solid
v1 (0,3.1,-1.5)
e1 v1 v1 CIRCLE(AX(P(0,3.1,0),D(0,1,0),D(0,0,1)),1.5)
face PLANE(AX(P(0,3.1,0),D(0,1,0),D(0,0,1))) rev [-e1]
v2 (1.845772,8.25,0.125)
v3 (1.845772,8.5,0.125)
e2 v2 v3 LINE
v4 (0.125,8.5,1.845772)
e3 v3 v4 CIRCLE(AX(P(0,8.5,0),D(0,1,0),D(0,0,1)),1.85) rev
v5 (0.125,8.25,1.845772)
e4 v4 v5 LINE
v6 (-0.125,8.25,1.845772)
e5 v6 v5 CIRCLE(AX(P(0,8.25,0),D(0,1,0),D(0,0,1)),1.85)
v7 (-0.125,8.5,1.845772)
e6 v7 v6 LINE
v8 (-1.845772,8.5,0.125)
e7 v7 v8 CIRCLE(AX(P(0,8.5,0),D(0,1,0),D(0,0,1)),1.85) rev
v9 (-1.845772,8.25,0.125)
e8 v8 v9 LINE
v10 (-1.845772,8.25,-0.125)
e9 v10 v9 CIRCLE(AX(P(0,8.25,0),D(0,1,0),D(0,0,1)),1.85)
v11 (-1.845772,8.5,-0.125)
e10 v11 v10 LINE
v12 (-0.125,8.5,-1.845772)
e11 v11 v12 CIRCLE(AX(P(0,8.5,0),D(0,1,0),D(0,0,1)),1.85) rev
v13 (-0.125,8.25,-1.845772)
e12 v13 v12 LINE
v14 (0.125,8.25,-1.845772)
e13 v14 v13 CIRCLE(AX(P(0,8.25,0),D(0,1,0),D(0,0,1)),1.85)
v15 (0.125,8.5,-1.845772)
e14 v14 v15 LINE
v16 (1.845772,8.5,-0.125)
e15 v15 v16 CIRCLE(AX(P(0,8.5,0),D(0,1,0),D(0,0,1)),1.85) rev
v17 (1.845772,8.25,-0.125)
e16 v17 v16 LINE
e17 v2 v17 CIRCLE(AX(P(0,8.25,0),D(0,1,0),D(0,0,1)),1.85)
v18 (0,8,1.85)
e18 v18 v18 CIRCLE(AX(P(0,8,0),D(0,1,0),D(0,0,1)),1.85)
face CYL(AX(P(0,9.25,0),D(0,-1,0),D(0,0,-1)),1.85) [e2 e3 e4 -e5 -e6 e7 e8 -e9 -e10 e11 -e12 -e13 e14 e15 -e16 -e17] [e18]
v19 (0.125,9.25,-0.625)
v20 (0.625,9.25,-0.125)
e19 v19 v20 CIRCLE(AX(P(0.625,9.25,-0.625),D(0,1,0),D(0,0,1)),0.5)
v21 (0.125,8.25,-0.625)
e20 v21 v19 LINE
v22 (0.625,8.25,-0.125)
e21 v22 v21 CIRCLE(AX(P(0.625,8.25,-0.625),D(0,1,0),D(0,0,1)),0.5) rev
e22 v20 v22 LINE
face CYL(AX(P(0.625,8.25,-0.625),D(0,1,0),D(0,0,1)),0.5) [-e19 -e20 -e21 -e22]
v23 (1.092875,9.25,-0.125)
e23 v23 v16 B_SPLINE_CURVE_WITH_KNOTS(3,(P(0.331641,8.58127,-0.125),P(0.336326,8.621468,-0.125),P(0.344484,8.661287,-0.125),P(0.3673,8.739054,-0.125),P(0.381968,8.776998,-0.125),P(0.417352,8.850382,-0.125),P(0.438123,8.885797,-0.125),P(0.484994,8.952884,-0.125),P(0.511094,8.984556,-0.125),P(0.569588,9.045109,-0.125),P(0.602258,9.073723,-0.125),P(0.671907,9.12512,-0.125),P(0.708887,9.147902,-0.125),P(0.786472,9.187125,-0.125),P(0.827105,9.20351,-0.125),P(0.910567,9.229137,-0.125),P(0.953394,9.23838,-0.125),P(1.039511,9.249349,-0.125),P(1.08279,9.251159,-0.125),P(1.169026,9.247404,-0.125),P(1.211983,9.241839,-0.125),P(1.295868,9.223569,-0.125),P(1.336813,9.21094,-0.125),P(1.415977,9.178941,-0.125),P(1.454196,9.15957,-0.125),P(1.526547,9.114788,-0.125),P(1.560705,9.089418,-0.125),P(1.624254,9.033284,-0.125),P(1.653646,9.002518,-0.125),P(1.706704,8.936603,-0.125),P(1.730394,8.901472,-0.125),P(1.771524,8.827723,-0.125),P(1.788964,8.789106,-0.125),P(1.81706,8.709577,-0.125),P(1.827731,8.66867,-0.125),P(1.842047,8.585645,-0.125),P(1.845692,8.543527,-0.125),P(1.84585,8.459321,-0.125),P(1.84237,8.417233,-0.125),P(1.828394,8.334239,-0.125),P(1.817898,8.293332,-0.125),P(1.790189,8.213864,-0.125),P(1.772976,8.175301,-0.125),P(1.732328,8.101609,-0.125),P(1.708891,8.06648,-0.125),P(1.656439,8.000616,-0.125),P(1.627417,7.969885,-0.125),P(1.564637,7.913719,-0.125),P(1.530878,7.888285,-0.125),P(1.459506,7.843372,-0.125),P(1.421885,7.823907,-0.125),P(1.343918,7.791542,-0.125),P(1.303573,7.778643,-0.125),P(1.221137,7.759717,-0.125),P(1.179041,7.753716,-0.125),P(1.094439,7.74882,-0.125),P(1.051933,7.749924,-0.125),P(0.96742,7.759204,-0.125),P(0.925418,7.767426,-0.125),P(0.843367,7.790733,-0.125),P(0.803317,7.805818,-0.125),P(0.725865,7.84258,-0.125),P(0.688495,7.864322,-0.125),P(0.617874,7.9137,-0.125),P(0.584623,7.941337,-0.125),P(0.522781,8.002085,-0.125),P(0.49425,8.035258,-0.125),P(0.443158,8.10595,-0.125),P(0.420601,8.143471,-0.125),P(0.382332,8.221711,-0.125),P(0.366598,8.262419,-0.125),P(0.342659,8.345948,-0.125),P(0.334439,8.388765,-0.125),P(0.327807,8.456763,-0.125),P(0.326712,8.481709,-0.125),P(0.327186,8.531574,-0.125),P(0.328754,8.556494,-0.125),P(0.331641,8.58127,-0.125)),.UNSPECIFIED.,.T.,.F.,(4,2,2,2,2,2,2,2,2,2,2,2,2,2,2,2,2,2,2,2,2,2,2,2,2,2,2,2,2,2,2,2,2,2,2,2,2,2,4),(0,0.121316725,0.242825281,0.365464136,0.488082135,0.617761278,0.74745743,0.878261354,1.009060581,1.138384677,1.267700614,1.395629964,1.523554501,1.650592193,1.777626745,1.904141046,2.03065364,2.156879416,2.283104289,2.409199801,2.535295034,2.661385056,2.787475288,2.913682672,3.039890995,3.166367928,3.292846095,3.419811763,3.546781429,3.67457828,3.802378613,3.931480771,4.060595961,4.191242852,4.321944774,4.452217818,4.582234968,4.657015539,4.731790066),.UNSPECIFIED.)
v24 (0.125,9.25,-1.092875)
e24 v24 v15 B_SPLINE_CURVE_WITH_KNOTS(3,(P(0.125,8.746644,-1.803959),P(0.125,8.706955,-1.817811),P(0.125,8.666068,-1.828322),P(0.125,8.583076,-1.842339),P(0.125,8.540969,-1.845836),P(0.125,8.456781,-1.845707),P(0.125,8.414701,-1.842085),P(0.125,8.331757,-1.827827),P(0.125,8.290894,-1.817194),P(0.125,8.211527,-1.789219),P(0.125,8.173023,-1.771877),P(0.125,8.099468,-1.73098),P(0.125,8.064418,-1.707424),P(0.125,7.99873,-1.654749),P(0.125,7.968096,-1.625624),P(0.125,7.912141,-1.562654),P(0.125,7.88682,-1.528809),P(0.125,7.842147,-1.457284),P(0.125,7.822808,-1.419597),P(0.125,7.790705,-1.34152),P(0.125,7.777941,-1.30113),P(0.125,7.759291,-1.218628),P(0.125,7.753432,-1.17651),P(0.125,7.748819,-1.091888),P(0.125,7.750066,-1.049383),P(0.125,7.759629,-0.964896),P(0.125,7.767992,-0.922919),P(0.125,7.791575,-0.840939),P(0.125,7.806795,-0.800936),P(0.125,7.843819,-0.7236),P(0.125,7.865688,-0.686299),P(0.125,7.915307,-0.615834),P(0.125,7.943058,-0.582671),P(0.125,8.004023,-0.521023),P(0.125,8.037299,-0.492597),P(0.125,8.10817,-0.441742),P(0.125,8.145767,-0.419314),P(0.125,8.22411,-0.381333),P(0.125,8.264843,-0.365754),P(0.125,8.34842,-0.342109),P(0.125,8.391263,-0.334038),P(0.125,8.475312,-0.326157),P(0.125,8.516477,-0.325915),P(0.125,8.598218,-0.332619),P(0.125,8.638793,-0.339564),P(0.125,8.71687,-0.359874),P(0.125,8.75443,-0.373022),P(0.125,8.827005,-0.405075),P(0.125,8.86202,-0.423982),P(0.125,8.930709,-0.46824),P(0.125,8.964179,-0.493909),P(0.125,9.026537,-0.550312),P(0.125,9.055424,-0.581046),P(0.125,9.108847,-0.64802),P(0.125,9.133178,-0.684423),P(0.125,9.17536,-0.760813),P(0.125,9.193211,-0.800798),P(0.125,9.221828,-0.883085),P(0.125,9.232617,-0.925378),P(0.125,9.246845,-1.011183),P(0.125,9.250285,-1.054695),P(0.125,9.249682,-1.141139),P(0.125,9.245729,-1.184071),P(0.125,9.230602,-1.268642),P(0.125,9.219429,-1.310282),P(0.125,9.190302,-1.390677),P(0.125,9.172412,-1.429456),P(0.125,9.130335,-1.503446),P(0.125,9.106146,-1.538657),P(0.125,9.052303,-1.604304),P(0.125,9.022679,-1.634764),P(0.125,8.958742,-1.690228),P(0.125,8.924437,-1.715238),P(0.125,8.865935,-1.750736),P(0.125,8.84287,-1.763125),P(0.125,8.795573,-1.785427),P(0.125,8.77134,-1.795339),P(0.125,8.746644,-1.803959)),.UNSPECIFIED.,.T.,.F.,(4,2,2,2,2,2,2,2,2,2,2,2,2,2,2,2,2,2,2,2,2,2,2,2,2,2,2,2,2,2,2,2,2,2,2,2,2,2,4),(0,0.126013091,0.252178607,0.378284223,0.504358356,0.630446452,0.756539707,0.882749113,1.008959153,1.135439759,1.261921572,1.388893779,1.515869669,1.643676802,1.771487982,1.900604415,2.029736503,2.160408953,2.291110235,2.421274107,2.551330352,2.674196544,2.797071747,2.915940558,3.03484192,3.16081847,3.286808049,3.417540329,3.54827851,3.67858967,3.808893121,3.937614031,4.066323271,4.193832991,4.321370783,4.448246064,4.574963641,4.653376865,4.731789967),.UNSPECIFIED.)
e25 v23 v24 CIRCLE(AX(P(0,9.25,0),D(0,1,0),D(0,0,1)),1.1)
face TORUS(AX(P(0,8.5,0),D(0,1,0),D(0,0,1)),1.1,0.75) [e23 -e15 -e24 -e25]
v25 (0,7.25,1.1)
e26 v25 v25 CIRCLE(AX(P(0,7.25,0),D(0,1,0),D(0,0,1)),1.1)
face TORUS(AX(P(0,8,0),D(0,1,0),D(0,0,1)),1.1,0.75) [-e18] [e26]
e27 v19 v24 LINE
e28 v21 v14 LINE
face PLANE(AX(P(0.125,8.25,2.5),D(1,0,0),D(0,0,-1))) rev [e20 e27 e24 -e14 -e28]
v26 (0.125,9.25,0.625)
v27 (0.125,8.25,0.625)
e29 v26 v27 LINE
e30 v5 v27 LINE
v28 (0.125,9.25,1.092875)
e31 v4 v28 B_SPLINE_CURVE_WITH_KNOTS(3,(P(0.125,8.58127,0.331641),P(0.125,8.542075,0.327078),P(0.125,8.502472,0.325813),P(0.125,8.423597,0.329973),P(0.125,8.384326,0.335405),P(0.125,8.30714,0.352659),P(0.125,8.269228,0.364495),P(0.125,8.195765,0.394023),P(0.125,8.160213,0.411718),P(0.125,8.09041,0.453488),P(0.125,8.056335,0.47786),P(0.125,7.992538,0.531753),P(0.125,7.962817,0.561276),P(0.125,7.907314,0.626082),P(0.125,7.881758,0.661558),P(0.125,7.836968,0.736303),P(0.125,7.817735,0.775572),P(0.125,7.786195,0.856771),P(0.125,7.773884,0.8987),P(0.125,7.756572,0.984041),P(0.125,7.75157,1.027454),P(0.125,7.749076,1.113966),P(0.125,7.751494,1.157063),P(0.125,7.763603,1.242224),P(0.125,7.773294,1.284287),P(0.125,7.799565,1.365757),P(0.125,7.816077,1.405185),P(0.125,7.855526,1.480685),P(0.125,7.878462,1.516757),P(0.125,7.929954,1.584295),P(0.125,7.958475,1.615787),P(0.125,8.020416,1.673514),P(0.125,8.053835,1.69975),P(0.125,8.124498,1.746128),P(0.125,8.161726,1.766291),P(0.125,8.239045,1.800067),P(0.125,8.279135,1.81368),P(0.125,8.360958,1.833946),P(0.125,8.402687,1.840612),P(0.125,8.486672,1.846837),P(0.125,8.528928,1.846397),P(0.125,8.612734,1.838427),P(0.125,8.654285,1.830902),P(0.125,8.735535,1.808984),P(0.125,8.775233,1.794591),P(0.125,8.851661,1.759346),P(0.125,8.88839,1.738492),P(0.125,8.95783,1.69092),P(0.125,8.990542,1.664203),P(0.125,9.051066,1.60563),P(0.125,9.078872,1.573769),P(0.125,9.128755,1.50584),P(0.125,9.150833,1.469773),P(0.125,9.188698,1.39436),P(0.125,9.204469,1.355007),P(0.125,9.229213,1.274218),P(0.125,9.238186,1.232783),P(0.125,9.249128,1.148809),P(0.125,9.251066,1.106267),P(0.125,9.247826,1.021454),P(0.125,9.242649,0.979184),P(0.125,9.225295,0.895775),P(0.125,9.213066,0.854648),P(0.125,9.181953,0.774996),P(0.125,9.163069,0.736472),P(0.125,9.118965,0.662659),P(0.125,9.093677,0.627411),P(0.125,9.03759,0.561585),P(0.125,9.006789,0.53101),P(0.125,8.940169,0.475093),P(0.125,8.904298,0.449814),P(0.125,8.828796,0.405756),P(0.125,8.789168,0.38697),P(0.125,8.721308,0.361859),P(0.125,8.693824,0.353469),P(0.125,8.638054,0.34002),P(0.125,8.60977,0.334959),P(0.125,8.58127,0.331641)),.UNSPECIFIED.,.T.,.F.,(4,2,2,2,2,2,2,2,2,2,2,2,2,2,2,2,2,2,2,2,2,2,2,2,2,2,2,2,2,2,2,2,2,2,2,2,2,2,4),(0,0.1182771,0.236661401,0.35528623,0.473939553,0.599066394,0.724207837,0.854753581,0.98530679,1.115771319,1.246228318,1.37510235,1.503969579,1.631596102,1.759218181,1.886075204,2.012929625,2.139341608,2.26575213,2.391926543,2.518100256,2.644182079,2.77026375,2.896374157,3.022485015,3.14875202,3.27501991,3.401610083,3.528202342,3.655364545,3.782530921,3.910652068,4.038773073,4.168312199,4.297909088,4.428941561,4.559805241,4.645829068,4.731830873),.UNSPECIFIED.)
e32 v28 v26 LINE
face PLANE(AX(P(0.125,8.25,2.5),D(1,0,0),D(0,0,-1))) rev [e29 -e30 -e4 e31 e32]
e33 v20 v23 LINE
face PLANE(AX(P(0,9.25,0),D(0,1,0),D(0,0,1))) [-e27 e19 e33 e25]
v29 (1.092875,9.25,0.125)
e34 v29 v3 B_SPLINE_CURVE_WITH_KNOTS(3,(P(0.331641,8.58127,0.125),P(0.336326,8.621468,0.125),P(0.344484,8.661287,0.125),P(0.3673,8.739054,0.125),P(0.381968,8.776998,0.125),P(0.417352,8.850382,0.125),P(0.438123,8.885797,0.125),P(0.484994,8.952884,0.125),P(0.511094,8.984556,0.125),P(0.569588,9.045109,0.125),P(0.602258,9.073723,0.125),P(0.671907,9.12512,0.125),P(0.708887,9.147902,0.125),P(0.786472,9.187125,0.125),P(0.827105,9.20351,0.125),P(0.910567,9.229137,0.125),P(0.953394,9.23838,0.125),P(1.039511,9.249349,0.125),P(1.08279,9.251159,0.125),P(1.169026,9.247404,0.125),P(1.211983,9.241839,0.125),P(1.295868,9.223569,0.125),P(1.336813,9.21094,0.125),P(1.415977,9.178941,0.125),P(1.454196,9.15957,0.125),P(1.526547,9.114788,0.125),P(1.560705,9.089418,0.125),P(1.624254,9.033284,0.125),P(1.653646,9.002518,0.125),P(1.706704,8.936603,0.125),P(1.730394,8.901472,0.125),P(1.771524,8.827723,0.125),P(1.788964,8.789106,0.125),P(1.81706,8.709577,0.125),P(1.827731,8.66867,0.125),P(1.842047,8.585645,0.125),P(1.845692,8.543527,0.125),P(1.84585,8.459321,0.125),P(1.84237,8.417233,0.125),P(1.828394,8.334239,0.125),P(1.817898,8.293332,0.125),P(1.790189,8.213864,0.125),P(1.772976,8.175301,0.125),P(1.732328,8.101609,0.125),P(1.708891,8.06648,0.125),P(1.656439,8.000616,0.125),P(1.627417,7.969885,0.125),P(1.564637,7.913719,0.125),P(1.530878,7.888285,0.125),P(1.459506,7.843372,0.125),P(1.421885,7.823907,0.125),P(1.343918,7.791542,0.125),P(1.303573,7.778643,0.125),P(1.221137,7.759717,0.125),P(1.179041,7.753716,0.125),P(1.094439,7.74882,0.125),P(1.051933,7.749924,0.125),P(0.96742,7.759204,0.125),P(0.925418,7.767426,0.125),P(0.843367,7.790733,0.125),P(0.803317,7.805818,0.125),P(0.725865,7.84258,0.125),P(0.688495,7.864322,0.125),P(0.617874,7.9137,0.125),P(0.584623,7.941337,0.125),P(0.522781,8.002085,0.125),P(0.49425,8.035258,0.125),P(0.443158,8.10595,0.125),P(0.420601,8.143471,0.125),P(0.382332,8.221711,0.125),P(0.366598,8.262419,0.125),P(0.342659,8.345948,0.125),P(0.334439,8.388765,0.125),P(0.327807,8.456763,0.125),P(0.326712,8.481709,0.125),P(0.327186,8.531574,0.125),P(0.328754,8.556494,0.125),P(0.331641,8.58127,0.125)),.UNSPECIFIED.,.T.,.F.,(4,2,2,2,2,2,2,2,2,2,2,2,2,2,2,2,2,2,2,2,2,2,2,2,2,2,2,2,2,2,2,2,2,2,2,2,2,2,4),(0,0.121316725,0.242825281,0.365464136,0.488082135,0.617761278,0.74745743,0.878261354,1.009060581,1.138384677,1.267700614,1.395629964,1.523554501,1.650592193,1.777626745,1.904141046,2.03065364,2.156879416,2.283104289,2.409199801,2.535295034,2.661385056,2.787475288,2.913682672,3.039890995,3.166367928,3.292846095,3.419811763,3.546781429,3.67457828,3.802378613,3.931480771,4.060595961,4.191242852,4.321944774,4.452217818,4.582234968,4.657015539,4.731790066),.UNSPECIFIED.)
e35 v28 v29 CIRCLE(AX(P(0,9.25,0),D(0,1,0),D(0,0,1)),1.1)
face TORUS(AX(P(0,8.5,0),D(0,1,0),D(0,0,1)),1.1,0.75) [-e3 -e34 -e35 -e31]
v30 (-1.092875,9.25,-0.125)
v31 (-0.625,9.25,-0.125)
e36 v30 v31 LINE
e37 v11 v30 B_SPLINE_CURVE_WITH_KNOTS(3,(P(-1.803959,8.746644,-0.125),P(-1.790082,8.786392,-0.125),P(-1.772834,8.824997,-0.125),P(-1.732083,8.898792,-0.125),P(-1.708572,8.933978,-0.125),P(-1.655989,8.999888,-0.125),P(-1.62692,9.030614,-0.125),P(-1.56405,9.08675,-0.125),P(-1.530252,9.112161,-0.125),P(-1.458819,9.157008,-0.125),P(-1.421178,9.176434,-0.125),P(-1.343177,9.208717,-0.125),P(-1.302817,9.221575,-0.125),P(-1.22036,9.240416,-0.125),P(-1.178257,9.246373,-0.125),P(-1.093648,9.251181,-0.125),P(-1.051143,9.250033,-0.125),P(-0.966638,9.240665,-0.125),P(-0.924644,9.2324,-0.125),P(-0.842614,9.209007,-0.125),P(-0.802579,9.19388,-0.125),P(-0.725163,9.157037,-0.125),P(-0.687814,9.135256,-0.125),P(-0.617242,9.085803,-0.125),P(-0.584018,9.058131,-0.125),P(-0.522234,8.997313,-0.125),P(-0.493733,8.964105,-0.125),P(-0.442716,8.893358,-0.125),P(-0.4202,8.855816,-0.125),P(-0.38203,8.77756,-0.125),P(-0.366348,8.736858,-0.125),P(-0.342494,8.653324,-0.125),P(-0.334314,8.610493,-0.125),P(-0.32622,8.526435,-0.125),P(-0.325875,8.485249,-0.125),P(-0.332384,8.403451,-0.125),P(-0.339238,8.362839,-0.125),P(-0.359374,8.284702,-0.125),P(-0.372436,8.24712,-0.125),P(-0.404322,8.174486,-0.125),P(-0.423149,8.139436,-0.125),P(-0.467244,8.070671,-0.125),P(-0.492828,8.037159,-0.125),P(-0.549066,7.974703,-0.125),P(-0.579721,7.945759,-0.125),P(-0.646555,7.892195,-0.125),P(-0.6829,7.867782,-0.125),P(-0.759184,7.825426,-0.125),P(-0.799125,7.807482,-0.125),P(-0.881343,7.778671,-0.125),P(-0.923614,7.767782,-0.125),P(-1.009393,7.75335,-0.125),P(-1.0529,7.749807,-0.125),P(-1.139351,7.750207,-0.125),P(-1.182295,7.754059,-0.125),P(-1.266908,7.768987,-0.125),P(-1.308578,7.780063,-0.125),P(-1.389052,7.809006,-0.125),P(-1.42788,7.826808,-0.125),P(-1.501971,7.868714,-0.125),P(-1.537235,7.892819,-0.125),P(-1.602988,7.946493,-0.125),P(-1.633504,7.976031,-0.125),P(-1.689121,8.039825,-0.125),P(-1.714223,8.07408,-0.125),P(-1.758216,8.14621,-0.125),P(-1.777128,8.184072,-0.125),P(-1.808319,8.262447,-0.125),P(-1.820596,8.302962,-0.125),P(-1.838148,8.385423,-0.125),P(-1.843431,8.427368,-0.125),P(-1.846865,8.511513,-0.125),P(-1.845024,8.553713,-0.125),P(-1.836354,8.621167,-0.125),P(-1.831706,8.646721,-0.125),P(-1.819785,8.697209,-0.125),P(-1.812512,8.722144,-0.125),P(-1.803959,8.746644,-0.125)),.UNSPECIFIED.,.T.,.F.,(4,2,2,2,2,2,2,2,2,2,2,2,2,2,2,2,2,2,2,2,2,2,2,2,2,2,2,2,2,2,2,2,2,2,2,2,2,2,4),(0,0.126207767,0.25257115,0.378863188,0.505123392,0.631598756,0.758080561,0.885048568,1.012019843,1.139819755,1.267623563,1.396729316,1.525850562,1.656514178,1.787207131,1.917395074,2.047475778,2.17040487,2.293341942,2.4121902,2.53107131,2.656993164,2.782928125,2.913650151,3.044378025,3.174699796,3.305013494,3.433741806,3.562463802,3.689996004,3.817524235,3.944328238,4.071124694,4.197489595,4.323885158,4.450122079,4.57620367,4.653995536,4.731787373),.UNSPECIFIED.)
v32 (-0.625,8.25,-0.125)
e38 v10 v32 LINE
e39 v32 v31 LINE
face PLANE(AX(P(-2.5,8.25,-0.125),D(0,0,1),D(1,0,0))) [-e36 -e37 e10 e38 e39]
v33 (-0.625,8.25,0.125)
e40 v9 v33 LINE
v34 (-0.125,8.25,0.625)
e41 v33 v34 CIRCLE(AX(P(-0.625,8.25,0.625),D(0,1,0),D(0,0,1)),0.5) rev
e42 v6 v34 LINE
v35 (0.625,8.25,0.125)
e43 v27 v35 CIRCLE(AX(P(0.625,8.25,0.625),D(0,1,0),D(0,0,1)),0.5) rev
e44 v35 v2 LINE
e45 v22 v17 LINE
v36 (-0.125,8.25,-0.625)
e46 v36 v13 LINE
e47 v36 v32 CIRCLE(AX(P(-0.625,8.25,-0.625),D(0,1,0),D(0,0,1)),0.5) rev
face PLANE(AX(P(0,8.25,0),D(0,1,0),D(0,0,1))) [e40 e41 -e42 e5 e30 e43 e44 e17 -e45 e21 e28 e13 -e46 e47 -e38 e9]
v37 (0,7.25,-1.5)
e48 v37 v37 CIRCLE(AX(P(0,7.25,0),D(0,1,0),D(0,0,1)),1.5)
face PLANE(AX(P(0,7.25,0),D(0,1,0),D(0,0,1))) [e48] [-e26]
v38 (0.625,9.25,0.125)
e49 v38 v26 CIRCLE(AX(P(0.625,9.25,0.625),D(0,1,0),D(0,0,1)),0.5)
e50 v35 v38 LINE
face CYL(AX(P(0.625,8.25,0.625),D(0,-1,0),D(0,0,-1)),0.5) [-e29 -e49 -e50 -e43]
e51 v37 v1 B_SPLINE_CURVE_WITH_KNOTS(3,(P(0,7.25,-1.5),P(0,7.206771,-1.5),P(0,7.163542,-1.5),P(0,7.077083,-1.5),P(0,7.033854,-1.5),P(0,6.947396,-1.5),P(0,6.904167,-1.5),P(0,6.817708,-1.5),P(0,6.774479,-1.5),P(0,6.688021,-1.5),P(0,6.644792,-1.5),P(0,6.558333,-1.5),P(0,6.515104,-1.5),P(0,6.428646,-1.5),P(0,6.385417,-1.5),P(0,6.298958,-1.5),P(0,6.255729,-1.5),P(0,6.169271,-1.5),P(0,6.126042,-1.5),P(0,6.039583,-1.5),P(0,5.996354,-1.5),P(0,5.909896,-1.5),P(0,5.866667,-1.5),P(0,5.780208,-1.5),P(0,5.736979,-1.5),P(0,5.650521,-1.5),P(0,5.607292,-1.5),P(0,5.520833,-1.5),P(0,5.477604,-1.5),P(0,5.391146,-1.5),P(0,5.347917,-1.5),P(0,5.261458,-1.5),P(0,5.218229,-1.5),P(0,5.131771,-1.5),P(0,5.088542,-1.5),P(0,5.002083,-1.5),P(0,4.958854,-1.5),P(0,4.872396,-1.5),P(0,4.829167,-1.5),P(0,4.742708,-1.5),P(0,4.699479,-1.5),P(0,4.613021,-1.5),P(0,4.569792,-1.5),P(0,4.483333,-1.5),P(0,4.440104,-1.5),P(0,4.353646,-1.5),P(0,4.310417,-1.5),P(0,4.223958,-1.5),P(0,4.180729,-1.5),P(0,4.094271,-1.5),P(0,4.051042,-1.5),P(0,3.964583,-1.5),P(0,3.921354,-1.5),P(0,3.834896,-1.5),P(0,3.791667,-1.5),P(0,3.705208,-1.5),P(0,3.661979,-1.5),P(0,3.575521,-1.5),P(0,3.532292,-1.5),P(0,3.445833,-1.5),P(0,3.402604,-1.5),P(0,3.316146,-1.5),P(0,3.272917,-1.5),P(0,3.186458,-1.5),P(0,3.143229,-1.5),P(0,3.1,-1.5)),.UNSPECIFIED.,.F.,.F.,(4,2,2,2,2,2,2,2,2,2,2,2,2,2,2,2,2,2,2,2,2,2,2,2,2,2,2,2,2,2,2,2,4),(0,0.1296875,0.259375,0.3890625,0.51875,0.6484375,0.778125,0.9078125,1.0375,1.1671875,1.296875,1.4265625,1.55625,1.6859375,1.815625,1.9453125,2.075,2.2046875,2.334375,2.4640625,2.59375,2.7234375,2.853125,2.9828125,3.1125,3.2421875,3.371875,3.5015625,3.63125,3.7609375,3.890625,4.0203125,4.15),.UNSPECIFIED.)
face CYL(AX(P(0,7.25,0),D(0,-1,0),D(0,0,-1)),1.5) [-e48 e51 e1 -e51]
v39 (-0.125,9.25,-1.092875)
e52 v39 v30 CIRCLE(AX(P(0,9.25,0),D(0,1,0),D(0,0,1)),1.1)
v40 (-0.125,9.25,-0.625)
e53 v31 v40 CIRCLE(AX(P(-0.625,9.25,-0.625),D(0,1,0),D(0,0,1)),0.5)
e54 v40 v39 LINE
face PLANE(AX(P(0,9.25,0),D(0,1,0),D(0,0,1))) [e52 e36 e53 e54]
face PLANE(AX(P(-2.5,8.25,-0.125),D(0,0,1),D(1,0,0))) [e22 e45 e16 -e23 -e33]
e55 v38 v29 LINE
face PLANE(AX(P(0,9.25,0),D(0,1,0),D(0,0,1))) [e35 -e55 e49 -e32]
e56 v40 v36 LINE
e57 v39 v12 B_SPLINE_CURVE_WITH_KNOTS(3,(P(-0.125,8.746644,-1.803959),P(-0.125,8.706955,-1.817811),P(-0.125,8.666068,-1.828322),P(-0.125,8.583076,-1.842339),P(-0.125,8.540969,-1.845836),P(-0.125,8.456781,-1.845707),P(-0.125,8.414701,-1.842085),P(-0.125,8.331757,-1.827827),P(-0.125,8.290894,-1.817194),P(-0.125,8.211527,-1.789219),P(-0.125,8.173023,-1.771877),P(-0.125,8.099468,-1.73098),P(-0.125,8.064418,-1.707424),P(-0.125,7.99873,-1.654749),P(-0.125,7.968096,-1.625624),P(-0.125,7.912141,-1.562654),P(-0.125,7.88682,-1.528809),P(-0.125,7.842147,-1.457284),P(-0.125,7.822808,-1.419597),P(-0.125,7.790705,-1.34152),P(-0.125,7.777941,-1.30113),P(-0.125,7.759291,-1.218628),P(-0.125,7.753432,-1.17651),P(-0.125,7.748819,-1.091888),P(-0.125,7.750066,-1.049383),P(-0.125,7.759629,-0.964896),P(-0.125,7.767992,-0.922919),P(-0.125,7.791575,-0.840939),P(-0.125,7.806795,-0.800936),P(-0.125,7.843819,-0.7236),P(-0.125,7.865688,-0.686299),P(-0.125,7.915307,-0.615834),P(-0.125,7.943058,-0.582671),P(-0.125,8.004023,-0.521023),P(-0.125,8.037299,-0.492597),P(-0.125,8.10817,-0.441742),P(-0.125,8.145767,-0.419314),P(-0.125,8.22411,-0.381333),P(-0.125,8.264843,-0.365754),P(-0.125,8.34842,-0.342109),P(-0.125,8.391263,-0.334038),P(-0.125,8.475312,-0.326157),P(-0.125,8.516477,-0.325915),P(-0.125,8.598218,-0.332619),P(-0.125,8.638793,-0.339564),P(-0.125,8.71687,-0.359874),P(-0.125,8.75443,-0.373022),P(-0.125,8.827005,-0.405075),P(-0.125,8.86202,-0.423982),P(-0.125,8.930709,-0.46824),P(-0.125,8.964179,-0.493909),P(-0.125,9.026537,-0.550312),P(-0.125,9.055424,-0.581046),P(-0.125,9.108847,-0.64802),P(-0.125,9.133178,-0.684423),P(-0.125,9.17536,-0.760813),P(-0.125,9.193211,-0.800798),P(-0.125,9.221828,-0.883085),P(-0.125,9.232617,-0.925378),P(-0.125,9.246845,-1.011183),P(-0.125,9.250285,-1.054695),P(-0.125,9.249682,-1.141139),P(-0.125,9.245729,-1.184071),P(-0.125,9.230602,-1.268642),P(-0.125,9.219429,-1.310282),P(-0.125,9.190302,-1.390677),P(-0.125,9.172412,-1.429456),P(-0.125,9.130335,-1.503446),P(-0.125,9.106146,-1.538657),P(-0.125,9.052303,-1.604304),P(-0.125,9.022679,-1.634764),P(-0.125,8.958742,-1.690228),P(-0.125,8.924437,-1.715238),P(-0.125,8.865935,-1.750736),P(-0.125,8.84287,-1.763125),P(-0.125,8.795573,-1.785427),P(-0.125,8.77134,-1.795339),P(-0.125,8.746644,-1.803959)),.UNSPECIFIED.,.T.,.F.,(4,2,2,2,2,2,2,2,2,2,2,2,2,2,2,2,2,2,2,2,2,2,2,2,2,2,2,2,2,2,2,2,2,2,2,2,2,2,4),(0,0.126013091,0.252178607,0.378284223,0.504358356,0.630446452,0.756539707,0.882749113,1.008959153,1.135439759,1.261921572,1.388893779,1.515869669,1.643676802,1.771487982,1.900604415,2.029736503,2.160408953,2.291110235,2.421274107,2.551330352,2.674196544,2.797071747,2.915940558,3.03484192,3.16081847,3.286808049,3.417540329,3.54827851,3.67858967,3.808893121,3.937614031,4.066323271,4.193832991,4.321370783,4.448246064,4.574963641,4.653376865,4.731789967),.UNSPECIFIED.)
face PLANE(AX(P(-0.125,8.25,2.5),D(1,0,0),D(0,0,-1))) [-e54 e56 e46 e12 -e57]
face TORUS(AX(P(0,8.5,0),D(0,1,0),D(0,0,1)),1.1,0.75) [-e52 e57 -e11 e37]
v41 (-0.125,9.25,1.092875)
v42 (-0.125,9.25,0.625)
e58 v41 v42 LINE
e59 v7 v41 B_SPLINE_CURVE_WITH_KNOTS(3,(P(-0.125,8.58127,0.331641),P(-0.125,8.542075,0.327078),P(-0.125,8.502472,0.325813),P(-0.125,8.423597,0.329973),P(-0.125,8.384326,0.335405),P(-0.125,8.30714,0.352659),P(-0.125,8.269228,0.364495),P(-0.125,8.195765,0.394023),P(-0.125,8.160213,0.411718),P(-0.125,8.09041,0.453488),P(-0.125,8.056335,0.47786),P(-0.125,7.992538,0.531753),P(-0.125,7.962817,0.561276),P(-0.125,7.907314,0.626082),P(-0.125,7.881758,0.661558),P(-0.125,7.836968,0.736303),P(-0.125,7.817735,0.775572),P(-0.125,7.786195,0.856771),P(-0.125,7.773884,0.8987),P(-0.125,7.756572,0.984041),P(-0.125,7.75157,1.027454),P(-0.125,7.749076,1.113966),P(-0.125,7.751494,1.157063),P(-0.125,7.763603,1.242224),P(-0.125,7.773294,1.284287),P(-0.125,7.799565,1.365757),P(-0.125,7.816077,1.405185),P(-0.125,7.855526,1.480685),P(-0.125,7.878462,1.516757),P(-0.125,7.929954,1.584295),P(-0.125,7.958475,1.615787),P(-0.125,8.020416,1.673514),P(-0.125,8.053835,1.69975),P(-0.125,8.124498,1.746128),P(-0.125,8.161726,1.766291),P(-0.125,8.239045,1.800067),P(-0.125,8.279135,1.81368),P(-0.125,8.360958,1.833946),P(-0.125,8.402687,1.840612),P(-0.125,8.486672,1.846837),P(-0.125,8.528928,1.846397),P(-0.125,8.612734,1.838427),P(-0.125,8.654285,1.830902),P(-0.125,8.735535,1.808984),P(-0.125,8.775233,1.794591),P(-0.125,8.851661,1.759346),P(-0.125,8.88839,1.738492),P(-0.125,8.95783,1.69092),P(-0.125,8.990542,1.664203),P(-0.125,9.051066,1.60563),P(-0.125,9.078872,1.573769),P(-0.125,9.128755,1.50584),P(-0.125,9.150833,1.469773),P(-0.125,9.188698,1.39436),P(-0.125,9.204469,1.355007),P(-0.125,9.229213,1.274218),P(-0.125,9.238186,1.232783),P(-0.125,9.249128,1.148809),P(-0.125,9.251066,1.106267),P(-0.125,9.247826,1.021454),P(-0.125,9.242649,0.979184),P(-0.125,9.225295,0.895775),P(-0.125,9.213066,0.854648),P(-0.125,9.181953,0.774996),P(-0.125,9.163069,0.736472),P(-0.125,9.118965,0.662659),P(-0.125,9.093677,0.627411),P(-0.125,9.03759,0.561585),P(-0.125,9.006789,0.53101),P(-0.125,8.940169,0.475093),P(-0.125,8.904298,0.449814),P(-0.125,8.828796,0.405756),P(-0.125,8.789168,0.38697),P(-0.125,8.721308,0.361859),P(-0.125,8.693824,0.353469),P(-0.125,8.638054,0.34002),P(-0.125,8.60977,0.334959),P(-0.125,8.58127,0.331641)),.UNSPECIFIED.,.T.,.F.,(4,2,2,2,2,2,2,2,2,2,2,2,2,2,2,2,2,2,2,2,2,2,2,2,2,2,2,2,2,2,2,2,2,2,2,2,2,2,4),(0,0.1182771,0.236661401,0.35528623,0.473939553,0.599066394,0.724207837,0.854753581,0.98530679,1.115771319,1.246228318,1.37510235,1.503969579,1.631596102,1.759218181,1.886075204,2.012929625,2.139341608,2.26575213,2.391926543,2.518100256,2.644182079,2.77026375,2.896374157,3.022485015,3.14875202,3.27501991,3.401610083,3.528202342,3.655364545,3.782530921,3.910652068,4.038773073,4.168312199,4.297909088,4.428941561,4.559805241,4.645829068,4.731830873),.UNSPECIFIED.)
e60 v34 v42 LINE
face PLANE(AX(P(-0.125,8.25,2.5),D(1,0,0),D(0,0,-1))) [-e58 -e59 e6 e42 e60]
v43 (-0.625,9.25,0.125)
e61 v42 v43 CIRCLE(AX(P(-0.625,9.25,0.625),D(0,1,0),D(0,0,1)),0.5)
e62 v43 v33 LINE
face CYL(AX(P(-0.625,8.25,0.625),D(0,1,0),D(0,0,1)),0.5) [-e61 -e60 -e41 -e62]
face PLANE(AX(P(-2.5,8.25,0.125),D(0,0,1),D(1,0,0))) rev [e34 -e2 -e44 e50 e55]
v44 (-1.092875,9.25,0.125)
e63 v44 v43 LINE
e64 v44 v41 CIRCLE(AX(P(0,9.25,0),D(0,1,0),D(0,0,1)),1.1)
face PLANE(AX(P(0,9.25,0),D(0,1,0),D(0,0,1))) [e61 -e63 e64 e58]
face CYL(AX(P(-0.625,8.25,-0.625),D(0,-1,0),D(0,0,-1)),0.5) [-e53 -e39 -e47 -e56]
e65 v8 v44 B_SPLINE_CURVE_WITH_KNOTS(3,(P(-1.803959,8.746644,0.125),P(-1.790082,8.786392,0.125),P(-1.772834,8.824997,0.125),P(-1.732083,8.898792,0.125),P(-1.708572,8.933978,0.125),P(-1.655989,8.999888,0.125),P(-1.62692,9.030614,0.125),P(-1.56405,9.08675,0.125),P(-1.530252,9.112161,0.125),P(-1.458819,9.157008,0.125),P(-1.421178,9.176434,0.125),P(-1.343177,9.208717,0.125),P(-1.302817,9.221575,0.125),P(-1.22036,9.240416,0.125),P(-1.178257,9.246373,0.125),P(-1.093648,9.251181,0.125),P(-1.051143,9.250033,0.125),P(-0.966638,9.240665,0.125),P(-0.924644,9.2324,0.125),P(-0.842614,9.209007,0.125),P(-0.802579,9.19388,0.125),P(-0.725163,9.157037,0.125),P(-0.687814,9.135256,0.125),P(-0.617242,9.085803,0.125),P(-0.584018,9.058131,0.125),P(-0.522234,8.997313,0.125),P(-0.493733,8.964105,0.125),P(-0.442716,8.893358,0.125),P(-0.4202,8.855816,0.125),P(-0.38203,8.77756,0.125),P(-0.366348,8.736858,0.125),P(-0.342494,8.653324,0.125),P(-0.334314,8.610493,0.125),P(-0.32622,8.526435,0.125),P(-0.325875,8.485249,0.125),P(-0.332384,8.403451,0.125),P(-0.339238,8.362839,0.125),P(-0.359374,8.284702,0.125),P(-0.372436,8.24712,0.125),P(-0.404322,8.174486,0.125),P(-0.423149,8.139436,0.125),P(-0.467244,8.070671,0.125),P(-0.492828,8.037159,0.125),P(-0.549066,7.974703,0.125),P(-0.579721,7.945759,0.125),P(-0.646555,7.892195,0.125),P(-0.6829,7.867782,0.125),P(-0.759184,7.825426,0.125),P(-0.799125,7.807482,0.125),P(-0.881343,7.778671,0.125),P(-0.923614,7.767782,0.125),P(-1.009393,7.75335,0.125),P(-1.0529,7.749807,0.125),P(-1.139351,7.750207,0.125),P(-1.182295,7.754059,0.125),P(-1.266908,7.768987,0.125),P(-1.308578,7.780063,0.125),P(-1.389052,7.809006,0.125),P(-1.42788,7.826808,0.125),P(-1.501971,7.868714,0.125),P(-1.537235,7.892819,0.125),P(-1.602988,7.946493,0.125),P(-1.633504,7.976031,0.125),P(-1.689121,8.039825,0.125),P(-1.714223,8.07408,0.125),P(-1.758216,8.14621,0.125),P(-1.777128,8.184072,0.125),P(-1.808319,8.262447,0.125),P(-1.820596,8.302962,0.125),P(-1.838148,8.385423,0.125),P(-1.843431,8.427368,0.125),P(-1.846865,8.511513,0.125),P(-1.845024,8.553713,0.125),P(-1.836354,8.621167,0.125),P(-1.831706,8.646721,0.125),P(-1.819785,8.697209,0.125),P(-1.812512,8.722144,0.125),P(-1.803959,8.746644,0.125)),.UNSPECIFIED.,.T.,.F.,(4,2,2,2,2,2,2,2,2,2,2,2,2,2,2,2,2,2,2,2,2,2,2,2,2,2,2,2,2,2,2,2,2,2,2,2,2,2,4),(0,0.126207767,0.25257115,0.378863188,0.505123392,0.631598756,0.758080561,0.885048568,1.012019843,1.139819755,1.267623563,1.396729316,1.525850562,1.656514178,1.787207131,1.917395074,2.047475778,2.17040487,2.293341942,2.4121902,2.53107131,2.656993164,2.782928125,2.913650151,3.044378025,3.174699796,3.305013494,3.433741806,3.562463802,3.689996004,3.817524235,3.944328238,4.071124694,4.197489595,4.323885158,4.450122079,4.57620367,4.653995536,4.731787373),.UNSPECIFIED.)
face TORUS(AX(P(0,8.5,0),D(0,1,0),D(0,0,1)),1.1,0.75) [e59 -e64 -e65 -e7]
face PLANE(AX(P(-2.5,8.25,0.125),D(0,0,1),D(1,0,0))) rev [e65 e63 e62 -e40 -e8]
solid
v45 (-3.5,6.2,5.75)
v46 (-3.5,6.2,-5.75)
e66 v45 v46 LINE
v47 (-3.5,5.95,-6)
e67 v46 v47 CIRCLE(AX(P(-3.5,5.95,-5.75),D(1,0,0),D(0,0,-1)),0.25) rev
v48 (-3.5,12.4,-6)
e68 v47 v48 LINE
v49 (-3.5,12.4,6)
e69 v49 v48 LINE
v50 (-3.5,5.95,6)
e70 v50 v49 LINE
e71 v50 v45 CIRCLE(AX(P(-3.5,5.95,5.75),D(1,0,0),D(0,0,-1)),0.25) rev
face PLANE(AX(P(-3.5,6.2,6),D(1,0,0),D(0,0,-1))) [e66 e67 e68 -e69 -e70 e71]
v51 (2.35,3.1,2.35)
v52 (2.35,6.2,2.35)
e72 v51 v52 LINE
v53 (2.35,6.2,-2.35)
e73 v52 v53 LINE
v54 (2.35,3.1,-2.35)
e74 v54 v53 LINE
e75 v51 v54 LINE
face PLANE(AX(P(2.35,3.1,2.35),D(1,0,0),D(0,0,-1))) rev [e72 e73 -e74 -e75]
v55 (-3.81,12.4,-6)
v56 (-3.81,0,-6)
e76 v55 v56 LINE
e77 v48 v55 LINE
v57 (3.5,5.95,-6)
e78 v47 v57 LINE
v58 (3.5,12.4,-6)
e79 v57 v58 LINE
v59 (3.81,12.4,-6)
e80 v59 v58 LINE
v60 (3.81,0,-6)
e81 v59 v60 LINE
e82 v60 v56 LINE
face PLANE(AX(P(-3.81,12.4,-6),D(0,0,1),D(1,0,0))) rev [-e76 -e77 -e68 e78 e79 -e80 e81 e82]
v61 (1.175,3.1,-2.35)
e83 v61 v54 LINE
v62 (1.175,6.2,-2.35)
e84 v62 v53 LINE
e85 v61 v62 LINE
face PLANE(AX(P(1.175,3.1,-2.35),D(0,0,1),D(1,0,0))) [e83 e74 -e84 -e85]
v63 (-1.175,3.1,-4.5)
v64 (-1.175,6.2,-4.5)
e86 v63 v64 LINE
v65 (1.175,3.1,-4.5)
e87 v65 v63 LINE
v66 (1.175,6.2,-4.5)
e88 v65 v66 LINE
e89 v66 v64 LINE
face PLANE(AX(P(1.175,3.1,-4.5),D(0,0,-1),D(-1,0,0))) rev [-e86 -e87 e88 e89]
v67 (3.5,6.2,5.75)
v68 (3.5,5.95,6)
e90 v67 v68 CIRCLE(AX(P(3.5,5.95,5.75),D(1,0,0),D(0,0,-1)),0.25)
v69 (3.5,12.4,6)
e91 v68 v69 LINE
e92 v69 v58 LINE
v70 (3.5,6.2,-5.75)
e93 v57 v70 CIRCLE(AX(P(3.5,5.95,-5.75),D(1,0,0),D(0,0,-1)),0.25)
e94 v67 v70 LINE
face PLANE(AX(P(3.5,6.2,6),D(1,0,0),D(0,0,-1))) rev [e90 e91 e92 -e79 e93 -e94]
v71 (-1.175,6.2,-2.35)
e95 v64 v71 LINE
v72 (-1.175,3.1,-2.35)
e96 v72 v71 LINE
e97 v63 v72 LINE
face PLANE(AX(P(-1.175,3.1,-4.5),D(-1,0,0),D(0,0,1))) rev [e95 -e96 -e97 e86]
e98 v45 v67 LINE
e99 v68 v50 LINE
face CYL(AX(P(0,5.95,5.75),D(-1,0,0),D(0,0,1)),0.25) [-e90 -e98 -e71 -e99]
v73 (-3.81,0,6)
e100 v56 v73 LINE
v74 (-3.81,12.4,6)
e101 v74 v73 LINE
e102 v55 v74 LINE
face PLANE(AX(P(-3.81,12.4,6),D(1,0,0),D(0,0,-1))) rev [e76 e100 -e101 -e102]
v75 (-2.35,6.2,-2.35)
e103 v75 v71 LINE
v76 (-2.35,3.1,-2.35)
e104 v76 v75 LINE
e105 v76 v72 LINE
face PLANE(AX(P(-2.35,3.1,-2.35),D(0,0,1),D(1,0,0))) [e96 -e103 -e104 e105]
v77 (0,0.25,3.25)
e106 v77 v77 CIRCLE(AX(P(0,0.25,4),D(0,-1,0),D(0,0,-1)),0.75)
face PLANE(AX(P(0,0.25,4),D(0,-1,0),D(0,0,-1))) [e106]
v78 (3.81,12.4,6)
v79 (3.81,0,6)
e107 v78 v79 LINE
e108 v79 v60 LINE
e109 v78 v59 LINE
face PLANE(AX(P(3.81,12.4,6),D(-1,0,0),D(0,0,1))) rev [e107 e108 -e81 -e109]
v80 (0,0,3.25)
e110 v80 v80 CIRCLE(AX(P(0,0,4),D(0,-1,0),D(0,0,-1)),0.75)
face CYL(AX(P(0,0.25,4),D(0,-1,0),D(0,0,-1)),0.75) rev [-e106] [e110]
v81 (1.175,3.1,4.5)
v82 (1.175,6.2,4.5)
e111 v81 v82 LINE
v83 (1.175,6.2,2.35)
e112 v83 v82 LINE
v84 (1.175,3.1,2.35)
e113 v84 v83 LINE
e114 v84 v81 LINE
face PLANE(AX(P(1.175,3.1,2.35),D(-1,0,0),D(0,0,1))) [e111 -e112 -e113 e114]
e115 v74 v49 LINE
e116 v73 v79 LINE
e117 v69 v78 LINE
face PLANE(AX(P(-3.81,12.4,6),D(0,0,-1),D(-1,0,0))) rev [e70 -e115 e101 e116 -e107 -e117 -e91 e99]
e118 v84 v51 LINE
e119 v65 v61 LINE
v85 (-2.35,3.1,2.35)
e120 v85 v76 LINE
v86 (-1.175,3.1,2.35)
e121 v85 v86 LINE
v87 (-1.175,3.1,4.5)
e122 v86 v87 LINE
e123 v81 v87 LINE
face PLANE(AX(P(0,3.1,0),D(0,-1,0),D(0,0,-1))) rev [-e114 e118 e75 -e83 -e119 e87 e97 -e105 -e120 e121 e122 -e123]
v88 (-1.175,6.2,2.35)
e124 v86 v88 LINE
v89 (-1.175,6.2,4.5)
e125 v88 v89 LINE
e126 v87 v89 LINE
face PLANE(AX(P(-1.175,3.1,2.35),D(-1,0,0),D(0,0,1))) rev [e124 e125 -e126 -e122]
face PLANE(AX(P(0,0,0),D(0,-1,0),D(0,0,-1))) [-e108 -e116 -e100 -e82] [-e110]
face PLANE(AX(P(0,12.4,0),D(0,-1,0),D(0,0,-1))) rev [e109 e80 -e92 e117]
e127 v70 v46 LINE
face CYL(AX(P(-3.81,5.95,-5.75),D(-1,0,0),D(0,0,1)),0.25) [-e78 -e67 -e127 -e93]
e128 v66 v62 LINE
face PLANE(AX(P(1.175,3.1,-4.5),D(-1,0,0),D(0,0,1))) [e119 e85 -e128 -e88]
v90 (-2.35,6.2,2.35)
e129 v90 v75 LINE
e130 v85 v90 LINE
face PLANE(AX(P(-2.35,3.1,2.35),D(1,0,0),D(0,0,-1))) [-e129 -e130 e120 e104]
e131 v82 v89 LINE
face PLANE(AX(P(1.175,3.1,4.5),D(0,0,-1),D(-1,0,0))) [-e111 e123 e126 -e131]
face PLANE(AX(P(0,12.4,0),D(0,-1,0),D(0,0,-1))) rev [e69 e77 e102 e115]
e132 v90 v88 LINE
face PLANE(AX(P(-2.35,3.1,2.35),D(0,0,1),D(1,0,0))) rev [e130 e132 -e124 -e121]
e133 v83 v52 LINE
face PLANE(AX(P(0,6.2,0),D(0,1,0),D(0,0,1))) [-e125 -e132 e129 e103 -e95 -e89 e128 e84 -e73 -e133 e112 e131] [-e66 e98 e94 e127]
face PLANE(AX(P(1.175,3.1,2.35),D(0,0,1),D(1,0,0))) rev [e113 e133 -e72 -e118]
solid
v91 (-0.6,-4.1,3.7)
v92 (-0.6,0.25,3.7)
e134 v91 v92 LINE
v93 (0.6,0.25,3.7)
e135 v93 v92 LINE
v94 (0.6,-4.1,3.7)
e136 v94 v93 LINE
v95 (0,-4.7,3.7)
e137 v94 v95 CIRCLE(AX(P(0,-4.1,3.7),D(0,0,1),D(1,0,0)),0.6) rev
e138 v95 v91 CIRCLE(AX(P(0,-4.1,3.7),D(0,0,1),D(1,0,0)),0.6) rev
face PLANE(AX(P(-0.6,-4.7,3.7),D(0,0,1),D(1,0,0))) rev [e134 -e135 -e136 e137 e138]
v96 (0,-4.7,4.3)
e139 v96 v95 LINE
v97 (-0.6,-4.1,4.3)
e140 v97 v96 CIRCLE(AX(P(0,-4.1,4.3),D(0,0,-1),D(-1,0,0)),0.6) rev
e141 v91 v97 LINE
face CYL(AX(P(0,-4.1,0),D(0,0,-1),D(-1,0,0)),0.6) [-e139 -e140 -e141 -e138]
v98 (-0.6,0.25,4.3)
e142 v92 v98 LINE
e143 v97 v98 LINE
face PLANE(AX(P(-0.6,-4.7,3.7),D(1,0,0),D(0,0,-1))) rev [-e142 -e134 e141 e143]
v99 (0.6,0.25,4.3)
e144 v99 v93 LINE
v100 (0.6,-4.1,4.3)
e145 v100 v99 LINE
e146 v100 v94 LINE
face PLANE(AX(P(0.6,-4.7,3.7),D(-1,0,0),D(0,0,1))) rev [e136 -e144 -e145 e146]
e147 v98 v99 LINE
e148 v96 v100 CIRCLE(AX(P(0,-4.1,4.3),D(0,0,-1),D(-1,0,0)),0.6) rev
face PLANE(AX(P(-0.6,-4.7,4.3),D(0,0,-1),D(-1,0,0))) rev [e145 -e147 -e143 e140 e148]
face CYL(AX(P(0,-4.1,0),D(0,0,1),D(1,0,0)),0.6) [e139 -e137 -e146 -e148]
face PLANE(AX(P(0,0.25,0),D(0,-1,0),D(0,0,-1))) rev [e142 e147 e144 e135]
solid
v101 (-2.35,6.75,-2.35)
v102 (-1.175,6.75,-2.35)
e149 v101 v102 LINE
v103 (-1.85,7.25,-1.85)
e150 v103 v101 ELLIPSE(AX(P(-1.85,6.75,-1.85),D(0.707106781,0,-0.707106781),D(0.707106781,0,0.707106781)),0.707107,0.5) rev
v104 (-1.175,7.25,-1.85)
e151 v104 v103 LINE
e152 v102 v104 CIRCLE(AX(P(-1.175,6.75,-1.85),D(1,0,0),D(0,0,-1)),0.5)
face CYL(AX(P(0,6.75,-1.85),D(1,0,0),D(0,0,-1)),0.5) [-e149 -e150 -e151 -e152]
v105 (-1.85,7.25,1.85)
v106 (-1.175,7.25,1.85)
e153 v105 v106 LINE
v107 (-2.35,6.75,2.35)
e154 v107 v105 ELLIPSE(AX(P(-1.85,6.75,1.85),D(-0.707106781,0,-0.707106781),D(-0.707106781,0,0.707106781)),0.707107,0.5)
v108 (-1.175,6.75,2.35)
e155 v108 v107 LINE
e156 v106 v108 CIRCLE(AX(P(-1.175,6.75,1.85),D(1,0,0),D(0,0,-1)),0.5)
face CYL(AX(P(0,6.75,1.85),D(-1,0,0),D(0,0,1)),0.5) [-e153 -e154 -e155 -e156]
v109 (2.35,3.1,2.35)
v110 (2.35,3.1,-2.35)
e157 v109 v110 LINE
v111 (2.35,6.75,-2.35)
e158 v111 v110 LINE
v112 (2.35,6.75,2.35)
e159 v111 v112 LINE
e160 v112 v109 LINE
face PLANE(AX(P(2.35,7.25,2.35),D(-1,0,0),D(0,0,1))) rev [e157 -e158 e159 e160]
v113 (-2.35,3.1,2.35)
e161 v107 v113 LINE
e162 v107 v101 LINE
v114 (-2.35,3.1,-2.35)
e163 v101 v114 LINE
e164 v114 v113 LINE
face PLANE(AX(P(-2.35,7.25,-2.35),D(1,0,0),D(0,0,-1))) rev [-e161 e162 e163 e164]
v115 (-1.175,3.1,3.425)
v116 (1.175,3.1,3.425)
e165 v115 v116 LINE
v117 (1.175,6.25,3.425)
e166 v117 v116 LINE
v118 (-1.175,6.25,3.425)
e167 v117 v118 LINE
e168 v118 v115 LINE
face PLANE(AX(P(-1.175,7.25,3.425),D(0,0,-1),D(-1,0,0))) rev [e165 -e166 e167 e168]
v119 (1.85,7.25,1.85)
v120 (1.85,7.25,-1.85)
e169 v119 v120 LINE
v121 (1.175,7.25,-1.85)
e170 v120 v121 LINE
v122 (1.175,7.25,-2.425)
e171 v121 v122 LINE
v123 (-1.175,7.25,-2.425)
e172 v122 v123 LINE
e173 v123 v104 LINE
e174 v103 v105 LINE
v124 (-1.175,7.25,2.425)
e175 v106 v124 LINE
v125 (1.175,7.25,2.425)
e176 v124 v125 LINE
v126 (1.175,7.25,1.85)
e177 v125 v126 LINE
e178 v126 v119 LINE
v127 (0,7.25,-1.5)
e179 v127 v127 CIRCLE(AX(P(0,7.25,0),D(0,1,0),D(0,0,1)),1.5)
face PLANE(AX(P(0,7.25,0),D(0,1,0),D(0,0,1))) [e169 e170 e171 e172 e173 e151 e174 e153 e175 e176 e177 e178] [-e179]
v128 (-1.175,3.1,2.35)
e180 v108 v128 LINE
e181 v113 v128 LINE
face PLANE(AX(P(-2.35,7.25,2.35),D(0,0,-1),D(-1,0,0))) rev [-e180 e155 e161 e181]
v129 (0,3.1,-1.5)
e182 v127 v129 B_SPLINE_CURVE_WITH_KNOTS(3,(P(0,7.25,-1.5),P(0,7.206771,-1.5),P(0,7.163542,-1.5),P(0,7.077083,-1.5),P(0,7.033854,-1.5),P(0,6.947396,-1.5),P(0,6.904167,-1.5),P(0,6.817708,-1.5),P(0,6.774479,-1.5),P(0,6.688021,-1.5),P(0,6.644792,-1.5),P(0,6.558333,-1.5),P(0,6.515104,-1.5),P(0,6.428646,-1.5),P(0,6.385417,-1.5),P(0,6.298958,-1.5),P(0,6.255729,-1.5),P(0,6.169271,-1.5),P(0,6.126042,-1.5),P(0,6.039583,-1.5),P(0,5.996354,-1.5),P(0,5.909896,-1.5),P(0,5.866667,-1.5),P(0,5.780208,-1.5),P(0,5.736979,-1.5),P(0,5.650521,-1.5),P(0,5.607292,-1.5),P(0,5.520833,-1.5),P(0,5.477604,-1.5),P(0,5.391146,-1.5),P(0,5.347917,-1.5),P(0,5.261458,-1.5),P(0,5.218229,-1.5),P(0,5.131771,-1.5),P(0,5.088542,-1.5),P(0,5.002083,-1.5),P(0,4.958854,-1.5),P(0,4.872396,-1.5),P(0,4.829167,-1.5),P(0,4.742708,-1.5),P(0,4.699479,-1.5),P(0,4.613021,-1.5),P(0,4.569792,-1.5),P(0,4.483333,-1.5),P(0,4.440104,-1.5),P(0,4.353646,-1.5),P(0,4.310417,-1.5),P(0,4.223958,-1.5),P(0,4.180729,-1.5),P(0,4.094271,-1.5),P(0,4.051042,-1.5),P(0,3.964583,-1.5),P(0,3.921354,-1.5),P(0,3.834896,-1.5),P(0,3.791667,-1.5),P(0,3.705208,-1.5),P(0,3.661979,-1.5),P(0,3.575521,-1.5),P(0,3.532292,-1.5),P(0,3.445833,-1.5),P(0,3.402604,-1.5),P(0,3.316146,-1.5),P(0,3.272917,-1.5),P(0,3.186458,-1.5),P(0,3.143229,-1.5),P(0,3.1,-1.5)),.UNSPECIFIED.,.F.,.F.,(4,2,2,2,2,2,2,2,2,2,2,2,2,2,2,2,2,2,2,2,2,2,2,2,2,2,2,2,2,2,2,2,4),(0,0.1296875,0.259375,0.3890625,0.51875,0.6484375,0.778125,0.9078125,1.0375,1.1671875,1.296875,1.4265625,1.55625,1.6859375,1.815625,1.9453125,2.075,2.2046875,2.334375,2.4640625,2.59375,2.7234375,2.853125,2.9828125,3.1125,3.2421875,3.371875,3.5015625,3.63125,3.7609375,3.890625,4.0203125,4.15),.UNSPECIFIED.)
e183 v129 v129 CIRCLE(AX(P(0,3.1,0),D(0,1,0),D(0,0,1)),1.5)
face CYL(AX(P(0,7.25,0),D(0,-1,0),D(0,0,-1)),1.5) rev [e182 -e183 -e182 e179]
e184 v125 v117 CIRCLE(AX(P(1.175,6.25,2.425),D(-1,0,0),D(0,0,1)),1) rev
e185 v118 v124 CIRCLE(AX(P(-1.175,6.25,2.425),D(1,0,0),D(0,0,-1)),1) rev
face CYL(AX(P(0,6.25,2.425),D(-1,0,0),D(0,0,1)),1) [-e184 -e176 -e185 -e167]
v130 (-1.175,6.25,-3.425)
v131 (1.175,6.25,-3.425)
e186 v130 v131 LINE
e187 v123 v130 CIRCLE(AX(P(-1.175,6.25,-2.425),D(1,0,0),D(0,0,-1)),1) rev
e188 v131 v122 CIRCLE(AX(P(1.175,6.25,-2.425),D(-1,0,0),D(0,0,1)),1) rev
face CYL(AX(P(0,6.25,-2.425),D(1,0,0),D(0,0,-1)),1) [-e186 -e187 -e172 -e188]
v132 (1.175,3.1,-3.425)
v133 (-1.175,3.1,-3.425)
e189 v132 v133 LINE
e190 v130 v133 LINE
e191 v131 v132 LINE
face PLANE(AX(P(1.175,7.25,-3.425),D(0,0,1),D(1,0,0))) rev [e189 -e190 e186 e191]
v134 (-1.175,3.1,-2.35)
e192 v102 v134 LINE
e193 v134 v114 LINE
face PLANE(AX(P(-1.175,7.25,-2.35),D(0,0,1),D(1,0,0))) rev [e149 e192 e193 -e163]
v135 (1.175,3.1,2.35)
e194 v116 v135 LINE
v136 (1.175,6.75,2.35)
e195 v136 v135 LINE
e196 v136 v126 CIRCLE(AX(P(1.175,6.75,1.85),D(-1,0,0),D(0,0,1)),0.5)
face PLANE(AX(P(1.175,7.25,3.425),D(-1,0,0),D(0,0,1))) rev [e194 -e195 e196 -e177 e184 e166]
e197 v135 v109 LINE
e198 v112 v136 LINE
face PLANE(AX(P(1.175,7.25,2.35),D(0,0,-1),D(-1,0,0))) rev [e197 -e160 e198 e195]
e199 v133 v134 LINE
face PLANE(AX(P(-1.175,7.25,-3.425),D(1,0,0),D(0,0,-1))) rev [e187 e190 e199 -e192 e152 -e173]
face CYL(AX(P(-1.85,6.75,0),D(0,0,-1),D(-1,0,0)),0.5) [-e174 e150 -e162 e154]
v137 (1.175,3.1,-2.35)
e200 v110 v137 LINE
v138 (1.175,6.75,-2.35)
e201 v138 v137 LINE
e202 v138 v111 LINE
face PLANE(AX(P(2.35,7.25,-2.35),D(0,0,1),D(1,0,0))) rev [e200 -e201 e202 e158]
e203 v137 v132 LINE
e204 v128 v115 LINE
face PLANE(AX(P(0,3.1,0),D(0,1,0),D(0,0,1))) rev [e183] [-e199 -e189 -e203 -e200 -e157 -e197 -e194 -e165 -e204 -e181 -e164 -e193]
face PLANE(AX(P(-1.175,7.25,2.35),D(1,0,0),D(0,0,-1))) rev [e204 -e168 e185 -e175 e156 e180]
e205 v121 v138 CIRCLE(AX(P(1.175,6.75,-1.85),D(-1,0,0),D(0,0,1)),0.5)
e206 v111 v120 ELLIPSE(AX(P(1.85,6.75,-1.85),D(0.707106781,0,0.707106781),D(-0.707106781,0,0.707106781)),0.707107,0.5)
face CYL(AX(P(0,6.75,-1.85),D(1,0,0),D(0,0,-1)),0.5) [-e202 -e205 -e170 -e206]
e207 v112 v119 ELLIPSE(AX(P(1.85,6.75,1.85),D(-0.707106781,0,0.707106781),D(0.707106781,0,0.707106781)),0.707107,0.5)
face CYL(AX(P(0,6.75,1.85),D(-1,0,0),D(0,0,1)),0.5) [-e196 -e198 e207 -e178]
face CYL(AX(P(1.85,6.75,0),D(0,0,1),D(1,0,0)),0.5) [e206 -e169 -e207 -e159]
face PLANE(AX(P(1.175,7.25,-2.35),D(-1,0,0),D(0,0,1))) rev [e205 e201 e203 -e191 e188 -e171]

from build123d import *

# Parameters (mm, degrees)
SKETCH_1_W          = 7.62
SKETCH_1_H          = 12
EXTRUDE_1_DEPTH     = 12.4
SKETCH_2_W          = 1.2
SKETCH_2_H          = 0.6
EXTRUDE_2_DEPTH     = 4.7
FILLET_1_R          = 0.6
SKETCH_3_W          = 7
SKETCH_3_H          = 12
CUT_EXTRUDE_1_DEPTH = 6.2
CUT_EXTRUDE_3_DEPTH = 3.1
SKETCH_5_R          = 1.5
EXTRUDE_4_DEPTH     = 4.15
SKETCH_6_R          = 1.5
EXTRUDE_5_DEPTH     = 4.15
FILLET_2_R          = 1
FILLET_3_R          = 0.5
SKETCH_7_R          = 1.85
EXTRUDE_6_DEPTH     = 2
FILLET_4_R          = 0.75
SKETCH_8_W          = 0.25
SKETCH_8_H          = 5
SKETCH_8_W_2        = 5
SKETCH_8_H_2        = 0.25
CUT_EXTRUDE_4_DEPTH = 1
FILLET_5_R          = 0.5
FILLET_6_R          = 0.25
SKETCH_9_R          = 0.75
CUT_EXTRUDE_5_DEPTH = 0.25
SKETCH_10_W         = 1.2
SKETCH_10_H         = 0.6
EXTRUDE_7_DEPTH     = 0.25


with BuildPart() as part:
    # 草图1 → 凸台-拉伸1 (new body)
    with BuildSketch(Plane(origin=(0, 0, 0), x_dir=(1, 0, 0), z_dir=(0, 1, 0))):
        Rectangle(SKETCH_1_W, SKETCH_1_H)
    extrude(amount=EXTRUDE_1_DEPTH)

    # 草图3 → 切除-拉伸1 (cut)
    with BuildSketch(Plane(origin=(0, 12.4, 0), x_dir=(1, 0, 0), z_dir=(0, 1, 0))):
        Rectangle(SKETCH_3_W, SKETCH_3_H)
    extrude(amount=-CUT_EXTRUDE_1_DEPTH, mode=Mode.SUBTRACT)

    # 草图4 → 切除-拉伸3 (cut)
    with BuildSketch(Plane(origin=(0, 6.2, 0), x_dir=(1, 0, 0), z_dir=(0, 1, 0))):
        Polygon((1.175, 2.35), (2.35, 2.35), (2.35, -2.35), (1.175, -2.35), (1.175, -4.5), (-1.175, -4.5), (-1.175, -2.35), (-2.35, -2.35), (-2.35, 2.35), (-1.175, 2.35), (-1.175, 4.5), (1.175, 4.5), align=None)
    extrude(amount=-CUT_EXTRUDE_3_DEPTH, mode=Mode.SUBTRACT)

    # 圆角6
    fillet_6_edges = [part.edges().sort_by_distance(p)[0] for p in [
        (0, 6.2, 6),
        (0, 6.2, -6),
    ]]
    fillet(fillet_6_edges, radius=FILLET_6_R)

    # 草图9 → 切除-拉伸5 (cut)
    with BuildSketch(Plane.XZ):
        with Locations(Location((0, 4, 0), (0, 0, 270))):
            Circle(SKETCH_9_R)
    extrude(amount=-CUT_EXTRUDE_5_DEPTH, mode=Mode.SUBTRACT)


with BuildPart() as body_2:
    # 草图2 → 凸台-拉伸2 (new body)
    with BuildSketch(Plane(origin=(0, 0, 0), x_dir=(-1, 0, 0), z_dir=(0, -1, 0))):
        with Locations((0, -4)):
            Rectangle(SKETCH_2_W, SKETCH_2_H)
    extrude(amount=EXTRUDE_2_DEPTH)

    # 圆角1
    fillet_1_edges = [body_2.edges().sort_by_distance(p)[0] for p in [
        (0.6, -4.7, 4),
        (-0.6, -4.7, 4),
    ]]
    fillet(fillet_1_edges, radius=FILLET_1_R - 0.0001)  # a hair under: the kernel refuses the full size

    # 草图10 → 凸台-拉伸7 (add)
    with BuildSketch(Plane(origin=(0, 0, 0), x_dir=(1, 0, 0), z_dir=(0, 1, 0))):
        with Locations((0, -4)):
            Rectangle(SKETCH_10_W, SKETCH_10_H)
    extrude(amount=EXTRUDE_7_DEPTH)


with BuildPart() as body_3:
    # 草图5 → 凸台-拉伸4 (new body)
    with BuildSketch(Plane(origin=(0, 3.1, 0), x_dir=(1, 0, 0), z_dir=(0, 1, 0))):
        Polygon((-2.35, 2.35), (-2.35, -2.35), (-1.175, -2.35), (-1.175, -3.425), (1.175, -3.425), (1.175, -2.35), (2.35, -2.35), (2.35, 2.35), (1.175, 2.35), (1.175, 3.425), (-1.175, 3.425), (-1.175, 2.35), align=None)
        with Locations(Location((0, 0, 0), (0, 0, 90))):
            Circle(SKETCH_5_R, mode=Mode.SUBTRACT)
    extrude(amount=EXTRUDE_4_DEPTH)

    # 圆角2
    fillet_2_edges = [body_3.edges().sort_by_distance(p)[0] for p in [
        (0, 7.25, 3.425),
        (0, 7.25, -3.425),
    ]]
    fillet(fillet_2_edges, radius=FILLET_2_R)

    # 圆角3
    fillet_3_edges = [body_3.edges().sort_by_distance(p)[0] for p in [
        (-1.7625, 7.25, 2.35),
        (1.7625, 7.25, 2.35),
        (2.35, 7.25, 0),
        (1.7625, 7.25, -2.35),
        (-1.7625, 7.25, -2.35),
        (-2.35, 7.25, 0),
    ]]
    fillet(fillet_3_edges, radius=FILLET_3_R)


with BuildPart() as body_4:
    # 草图6 → 凸台-拉伸5 (new body)
    with BuildSketch(Plane(origin=(0, 3.1, 0), x_dir=(1, 0, 0), z_dir=(0, 1, 0))):
        with Locations(Location((0, 0, 0), (0, 0, 90))):
            Circle(SKETCH_6_R)
    extrude(amount=EXTRUDE_5_DEPTH)


with BuildPart() as body_5:
    # 草图7 → 凸台-拉伸6 (new body)
    with BuildSketch(Plane(origin=(0, 7.25, 0), x_dir=(1, 0, 0), z_dir=(0, 1, 0))):
        with Locations(Location((0, 0, 0), (0, 0, 270))):
            Circle(SKETCH_7_R)
    extrude(amount=EXTRUDE_6_DEPTH)

    # 圆角4
    fillet_4_edges = [body_5.edges().sort_by_distance(p)[0] for p in [
        (0, 7.25, -1.85),
        (0, 9.25, -1.85),
    ]]
    fillet(fillet_4_edges, radius=FILLET_4_R)

    # 草图8 → 切除-拉伸4 (cut)
    with BuildSketch(Plane(origin=(0, 9.25, 0), x_dir=(1, 0, 0), z_dir=(0, 1, 0))):
        Rectangle(SKETCH_8_W, SKETCH_8_H)
        Rectangle(SKETCH_8_W_2, SKETCH_8_H_2)
    extrude(amount=-CUT_EXTRUDE_4_DEPTH, mode=Mode.SUBTRACT)

    # 圆角5
    fillet_5_edges = [body_5.edges().sort_by_distance(p)[0] for p in [
        (-0.125, 8.75, 0.125),
        (0.125, 8.75, -0.125),
        (0.125, 8.75, 0.125),
        (-0.125, 8.75, -0.125),
    ]]
    fillet(fillet_5_edges, radius=FILLET_5_R)


with BuildPart() as body_4_1:
    add(body_4.part)

    # Combine 1: union body 5
    add(body_5.part)


solid = Compound([part.part, body_2.part, body_3.part, body_4_1.part])
